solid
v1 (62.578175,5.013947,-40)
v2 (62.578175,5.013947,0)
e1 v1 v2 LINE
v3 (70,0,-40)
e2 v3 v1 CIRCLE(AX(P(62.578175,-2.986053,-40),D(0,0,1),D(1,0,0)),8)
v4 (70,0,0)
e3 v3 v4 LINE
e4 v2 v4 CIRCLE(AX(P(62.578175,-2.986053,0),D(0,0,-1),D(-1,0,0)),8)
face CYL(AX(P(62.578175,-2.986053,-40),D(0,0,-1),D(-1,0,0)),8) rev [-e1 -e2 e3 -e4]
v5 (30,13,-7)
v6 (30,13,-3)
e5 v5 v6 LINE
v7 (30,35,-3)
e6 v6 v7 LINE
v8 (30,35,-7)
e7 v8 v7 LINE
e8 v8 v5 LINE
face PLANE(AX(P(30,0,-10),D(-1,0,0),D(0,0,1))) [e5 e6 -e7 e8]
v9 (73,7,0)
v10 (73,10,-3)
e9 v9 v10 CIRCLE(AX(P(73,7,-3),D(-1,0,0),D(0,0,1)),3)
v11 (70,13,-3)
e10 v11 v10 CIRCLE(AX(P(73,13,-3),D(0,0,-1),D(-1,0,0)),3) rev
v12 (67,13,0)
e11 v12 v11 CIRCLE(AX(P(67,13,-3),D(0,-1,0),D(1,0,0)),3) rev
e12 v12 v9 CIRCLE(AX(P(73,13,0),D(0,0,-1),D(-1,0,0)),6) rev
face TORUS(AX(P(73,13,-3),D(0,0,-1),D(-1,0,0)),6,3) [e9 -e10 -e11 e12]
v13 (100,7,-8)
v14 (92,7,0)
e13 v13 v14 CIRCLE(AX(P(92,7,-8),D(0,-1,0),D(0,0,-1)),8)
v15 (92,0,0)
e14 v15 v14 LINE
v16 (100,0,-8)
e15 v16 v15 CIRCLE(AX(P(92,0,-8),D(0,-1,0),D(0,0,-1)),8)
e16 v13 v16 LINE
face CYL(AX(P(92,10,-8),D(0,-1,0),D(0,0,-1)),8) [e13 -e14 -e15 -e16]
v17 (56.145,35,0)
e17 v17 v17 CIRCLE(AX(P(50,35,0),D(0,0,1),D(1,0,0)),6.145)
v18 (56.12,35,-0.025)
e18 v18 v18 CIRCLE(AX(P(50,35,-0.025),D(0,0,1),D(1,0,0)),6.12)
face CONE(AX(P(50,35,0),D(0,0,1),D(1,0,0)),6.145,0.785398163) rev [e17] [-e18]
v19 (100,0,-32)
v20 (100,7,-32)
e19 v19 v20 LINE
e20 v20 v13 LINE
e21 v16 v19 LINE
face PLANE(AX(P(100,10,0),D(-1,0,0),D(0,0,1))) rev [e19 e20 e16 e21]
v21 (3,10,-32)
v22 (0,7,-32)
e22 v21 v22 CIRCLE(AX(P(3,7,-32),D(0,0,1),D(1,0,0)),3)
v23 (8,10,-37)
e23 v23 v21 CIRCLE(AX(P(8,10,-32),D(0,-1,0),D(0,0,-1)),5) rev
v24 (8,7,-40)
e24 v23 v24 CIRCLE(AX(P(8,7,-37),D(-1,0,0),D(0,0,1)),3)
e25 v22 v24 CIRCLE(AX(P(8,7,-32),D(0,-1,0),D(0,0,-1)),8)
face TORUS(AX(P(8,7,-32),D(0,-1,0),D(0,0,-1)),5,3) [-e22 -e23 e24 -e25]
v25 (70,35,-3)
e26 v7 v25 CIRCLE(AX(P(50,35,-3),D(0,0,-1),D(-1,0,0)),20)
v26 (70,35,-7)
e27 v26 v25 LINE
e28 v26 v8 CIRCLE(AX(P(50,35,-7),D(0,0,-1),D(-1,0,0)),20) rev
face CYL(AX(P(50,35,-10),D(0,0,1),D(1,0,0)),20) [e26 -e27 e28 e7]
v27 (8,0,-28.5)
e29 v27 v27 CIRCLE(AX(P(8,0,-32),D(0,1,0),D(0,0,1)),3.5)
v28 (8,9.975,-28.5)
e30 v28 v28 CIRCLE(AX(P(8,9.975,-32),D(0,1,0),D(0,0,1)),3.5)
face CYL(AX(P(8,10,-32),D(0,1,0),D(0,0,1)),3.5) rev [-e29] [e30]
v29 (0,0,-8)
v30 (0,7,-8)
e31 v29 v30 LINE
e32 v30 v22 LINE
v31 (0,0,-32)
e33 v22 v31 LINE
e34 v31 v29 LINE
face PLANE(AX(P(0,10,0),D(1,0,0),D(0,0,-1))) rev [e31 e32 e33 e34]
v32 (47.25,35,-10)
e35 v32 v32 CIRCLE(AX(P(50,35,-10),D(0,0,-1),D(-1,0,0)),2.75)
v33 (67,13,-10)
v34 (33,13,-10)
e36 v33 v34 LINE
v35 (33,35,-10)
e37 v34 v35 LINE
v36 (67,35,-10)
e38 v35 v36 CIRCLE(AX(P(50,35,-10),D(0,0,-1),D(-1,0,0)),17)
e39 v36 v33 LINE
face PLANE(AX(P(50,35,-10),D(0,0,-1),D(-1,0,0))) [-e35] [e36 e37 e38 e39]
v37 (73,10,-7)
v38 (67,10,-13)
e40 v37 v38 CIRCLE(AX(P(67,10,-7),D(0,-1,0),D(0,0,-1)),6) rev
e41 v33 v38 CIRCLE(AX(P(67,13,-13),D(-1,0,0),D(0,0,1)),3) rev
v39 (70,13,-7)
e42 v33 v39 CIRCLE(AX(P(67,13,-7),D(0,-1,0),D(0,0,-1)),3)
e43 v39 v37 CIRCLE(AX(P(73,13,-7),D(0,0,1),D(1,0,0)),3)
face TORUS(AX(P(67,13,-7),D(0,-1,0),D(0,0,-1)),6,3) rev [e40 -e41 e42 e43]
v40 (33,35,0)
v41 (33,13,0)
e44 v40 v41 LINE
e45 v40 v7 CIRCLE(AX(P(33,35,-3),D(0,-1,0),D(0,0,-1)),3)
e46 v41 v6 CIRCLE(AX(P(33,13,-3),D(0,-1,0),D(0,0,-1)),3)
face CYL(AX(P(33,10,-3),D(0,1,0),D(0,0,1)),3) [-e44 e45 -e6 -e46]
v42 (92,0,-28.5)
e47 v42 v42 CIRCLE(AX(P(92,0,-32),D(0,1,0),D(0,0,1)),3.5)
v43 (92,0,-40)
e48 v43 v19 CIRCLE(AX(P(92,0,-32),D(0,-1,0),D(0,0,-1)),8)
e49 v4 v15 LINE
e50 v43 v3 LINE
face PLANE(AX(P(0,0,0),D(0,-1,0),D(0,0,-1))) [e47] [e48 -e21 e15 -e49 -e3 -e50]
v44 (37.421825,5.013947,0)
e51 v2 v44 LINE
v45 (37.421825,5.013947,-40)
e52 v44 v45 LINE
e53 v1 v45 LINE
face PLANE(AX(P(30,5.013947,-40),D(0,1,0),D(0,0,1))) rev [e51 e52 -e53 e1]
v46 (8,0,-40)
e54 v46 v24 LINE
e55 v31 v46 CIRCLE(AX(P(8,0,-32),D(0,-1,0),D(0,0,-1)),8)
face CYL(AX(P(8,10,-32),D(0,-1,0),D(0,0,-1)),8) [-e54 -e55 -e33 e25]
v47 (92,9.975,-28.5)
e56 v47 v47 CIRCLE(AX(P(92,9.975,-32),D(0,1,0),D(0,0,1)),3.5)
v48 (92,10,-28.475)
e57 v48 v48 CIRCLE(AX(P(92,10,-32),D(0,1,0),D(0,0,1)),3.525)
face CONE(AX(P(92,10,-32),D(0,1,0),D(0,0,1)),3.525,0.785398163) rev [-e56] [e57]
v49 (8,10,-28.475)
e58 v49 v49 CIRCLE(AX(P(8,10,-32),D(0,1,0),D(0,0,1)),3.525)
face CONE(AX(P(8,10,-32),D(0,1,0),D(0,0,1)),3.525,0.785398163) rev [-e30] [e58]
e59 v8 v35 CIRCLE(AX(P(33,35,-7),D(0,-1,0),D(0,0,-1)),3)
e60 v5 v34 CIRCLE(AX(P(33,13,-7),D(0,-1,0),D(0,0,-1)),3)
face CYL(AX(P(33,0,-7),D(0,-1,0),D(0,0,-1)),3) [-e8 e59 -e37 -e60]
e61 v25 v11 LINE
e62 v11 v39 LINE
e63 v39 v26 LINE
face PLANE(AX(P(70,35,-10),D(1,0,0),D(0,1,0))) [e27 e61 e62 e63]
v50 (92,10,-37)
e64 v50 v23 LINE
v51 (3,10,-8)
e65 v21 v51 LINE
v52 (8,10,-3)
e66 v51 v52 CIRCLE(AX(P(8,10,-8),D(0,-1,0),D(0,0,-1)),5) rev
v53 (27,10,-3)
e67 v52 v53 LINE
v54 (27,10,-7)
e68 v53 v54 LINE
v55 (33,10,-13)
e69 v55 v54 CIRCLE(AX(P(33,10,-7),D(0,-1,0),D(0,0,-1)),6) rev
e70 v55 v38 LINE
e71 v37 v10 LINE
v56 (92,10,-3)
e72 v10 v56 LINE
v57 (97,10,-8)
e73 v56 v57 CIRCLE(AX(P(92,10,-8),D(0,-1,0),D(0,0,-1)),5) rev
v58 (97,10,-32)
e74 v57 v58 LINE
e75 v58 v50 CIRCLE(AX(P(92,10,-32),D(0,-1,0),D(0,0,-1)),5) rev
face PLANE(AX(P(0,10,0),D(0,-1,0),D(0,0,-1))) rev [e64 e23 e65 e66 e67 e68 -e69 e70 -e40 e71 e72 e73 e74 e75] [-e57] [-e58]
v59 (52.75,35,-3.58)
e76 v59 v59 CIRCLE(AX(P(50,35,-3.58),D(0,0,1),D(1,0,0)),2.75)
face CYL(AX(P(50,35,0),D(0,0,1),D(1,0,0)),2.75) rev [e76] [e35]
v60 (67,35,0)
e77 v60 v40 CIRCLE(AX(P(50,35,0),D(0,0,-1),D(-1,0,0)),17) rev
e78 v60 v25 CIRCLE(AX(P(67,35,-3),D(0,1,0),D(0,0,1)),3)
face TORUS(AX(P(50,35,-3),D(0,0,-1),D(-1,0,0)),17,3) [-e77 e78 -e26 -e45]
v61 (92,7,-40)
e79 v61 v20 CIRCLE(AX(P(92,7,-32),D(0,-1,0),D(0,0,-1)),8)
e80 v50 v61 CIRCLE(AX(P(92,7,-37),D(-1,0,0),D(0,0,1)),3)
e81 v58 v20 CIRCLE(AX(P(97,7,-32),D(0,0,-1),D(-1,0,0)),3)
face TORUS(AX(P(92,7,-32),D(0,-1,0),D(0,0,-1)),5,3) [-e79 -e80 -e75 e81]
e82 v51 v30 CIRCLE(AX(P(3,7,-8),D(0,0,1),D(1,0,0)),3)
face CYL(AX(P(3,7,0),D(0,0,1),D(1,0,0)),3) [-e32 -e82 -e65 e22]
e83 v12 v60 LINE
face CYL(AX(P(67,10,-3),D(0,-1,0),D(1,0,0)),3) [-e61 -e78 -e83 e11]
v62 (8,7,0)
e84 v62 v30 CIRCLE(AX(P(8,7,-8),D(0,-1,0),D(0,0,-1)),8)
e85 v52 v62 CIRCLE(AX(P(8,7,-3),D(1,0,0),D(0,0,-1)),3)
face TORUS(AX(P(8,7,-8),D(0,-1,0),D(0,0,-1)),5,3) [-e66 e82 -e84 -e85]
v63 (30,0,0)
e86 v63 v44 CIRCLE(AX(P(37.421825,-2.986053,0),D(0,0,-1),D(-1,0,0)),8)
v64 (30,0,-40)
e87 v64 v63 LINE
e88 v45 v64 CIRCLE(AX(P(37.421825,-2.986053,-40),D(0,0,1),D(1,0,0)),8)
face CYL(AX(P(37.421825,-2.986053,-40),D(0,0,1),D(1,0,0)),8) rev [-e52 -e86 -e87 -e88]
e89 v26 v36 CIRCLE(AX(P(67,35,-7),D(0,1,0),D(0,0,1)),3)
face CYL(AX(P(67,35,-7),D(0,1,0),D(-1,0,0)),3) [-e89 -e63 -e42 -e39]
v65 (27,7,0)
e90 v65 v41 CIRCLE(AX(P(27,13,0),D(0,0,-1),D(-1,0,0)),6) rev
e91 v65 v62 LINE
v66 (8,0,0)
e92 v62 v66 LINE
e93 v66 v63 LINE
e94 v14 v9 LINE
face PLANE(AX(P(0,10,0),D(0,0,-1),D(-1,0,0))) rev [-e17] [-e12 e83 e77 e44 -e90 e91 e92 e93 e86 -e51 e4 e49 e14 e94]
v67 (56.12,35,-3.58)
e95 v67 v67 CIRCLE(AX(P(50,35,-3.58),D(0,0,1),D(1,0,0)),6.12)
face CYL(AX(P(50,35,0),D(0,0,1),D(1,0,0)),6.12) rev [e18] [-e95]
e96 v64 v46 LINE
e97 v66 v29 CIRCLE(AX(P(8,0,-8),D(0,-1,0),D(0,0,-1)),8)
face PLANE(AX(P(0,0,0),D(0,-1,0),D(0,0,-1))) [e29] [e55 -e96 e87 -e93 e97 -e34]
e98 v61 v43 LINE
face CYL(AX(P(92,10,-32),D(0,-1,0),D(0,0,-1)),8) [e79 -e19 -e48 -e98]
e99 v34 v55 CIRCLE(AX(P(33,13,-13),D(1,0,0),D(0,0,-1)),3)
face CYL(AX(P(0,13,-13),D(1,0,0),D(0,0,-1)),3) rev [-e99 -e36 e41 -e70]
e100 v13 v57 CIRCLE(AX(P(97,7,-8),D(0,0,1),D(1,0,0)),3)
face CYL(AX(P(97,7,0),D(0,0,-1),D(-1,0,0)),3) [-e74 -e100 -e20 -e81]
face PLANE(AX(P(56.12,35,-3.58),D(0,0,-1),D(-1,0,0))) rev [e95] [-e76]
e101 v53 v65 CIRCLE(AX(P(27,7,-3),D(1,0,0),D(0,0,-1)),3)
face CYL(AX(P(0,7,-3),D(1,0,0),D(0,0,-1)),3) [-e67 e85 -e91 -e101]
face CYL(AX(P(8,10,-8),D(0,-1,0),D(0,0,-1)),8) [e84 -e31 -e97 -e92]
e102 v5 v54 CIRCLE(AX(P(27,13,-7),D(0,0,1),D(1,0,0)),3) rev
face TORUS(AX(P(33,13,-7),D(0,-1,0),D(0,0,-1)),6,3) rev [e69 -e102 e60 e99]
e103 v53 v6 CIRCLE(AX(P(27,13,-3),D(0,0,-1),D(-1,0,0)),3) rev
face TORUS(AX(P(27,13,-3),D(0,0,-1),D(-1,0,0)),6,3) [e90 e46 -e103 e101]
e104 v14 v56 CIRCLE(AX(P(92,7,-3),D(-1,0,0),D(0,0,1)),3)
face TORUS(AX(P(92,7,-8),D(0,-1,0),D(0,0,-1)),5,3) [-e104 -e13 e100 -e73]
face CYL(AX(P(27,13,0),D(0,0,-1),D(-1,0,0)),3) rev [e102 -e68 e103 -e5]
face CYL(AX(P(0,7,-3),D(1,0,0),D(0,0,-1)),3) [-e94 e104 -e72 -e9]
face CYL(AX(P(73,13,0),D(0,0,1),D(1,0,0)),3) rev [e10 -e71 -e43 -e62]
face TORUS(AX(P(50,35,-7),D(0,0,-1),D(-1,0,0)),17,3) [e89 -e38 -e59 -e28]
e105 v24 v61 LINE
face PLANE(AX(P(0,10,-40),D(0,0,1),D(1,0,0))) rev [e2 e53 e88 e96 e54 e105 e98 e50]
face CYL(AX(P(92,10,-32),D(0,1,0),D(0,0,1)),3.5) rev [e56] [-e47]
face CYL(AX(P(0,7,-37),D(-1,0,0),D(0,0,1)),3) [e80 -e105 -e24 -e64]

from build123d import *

# Parameters (mm, degrees)
ESBO_O1_W                            = 100
ESBO_O1_H                            = 40
RESSALTO_EXTRUS_O1_DEPTH             = 10
RESSALTO_EXTRUS_O2_DEPTH             = 10
ESBO_O4_W                            = 40
ESBO_O4_H                            = 5.013946539
CORTE_EXTRUS_O1_DEPTH                = 121.933866224
FILETE1_R                            = 8
FURO_DE_DI_METRO_7_0_7_1_D           = 7
FURO_DE_DI_METRO_7_0_7_1_CSINK_D     = 7.05
FURO_DE_DI_METRO_7_0_7_1_CSINK_ANGLE = 90
FILETE2_R                            = 3


with BuildPart() as part:
    # Esboço1 → Ressalto-extrusão1 (new body)
    with BuildSketch(Plane(origin=(0, 0, 0), x_dir=(1, 0, 0), z_dir=(0, 1, 0))):
        with Locations((50, 20)):
            Rectangle(ESBO_O1_W, ESBO_O1_H)
    extrude(amount=RESSALTO_EXTRUS_O1_DEPTH)

    # Esboço3 → Ressalto-extrusão2 (add)
    with BuildSketch(Plane.XY):
        with BuildLine():
            Line((30, 0), (30, 35))
            ThreePointArc((30, 35), (50, 55), (70, 35))
            Line((70, 35), (70, 0))
            Line((70, 0), (30, 0))
        make_face()
    extrude(amount=-RESSALTO_EXTRUS_O2_DEPTH)

    # Esboço4 → Corte-extrusão1 (cut, through all)
    with BuildSketch(Plane.XY):
        with Locations((50, 2.506973269)):
            Rectangle(ESBO_O4_W, ESBO_O4_H)
    extrude(amount=-CORTE_EXTRUS_O1_DEPTH, mode=Mode.SUBTRACT)

    # Esboço6 → Rebaixo para parafuso de cabeça sextavada de M51 (revolve, cut)
    with BuildSketch(Plane(origin=(50, 35, 0), x_dir=(0, -1, 0), z_dir=(1, 0, 0))):
        Polygon((0, 0), (0, 40), (2.75, 40), (2.75, 3.58), (6.12, 3.58), (6.12, 0.025), (6.145, 0), align=None)
    revolve(axis=Axis((50, 35, 6.35), (0, 0, -1)), mode=Mode.SUBTRACT)

    # Filete1
    # the kernel refuses this fillet: 8 mm, written as the material it adds along each edge
    with BuildSketch(Plane(origin=(70, 5.013946539, 0), x_dir=(-1, 0, 0), z_dir=(0, 0, -1))) as filete1_piece_1:
        with BuildLine():
            CenterArc((7.421824892, -8), FILETE1_R, 90, 68.083393909)
            Line((0, -5.013946539), (0, 0))
            Line((0, 0), (7.421824892, 0))
        make_face()
    extrude(amount=40)
    with BuildSketch(Plane(origin=(30, 5.013946539, 0), x_dir=(0, -1, 0), z_dir=(0, 0, -1))) as filete1_piece_2:
        with BuildLine():
            CenterArc((8, -7.421824892), FILETE1_R, 111.916606091, 68.083393909)
            Line((0, -7.421824892), (0, 0))
            Line((0, 0), (5.013946539, 0))
        make_face()
    extrude(amount=40)
    # the kernel refuses this fillet: 8 mm, written as the material it takes off along each edge
    with BuildSketch(Plane(origin=(0, -20, -40), x_dir=(0, 0, 1), z_dir=(0, 1, 0)), Plane(origin=(0, -20, 0), x_dir=(1, 0, 0), z_dir=(0, 1, 0))) as filete1_2_piece_1:
        with BuildLine():
            CenterArc((FILETE1_R, FILETE1_R), FILETE1_R, 180, 90)
            Line((0, FILETE1_R), (0, 0))
            Line((0, 0), (FILETE1_R, 0))
        make_face()
    extrude(amount=50, mode=Mode.SUBTRACT)
    with BuildSketch(Plane(origin=(100, -20, -40), x_dir=(0, 0, 1), z_dir=(0, 1, 0)), Plane(origin=(100, -20, 0), x_dir=(-1, 0, 0), z_dir=(0, 1, 0))) as filete1_2_piece_2:
        with BuildLine():
            CenterArc((FILETE1_R, -FILETE1_R), FILETE1_R, 90, 90)
            Line((0, -FILETE1_R), (0, 0))
            Line((0, 0), (FILETE1_R, 0))
        make_face()
    extrude(amount=50, mode=Mode.SUBTRACT)

    # Furo de diâmetro Ø7.0 (7)1 (through all)
    with Locations(Plane(origin=(0, 10, 0), x_dir=(1, 0, 0), z_dir=(0, 1, 0))):
        with Locations((8, 32), (92, 32)):
            CounterSinkHole(FURO_DE_DI_METRO_7_0_7_1_D / 2, FURO_DE_DI_METRO_7_0_7_1_CSINK_D / 2, counter_sink_angle=FURO_DE_DI_METRO_7_0_7_1_CSINK_ANGLE)

    # Filete2
    filete2_edges = [part.edges().sort_by_distance(p)[0] for p in [
        (81, 10, 0),
        (30, 22.5, -10),
        (70, 22.5, -10),
        (30, 22.5, 0),
        (70, 22.5, 0),
        (50, 55, 0),
        (30, 10, -5),
        (50, 55, -10),
        (70, 10, -5),
        (50, 10, -10),
        (0, 10, -20),
        (50, 10, -40),
        (19, 10, 0),
        (100, 10, -20),
        (97.656854249, 10, -2.343145751),
        (97.656854249, 10, -37.656854249),
        (2.343145751, 10, -2.343145751),
        (2.343145751, 10, -37.656854249),
    ]]
    fillet(filete2_edges, radius=FILETE2_R)


solid = part.part
